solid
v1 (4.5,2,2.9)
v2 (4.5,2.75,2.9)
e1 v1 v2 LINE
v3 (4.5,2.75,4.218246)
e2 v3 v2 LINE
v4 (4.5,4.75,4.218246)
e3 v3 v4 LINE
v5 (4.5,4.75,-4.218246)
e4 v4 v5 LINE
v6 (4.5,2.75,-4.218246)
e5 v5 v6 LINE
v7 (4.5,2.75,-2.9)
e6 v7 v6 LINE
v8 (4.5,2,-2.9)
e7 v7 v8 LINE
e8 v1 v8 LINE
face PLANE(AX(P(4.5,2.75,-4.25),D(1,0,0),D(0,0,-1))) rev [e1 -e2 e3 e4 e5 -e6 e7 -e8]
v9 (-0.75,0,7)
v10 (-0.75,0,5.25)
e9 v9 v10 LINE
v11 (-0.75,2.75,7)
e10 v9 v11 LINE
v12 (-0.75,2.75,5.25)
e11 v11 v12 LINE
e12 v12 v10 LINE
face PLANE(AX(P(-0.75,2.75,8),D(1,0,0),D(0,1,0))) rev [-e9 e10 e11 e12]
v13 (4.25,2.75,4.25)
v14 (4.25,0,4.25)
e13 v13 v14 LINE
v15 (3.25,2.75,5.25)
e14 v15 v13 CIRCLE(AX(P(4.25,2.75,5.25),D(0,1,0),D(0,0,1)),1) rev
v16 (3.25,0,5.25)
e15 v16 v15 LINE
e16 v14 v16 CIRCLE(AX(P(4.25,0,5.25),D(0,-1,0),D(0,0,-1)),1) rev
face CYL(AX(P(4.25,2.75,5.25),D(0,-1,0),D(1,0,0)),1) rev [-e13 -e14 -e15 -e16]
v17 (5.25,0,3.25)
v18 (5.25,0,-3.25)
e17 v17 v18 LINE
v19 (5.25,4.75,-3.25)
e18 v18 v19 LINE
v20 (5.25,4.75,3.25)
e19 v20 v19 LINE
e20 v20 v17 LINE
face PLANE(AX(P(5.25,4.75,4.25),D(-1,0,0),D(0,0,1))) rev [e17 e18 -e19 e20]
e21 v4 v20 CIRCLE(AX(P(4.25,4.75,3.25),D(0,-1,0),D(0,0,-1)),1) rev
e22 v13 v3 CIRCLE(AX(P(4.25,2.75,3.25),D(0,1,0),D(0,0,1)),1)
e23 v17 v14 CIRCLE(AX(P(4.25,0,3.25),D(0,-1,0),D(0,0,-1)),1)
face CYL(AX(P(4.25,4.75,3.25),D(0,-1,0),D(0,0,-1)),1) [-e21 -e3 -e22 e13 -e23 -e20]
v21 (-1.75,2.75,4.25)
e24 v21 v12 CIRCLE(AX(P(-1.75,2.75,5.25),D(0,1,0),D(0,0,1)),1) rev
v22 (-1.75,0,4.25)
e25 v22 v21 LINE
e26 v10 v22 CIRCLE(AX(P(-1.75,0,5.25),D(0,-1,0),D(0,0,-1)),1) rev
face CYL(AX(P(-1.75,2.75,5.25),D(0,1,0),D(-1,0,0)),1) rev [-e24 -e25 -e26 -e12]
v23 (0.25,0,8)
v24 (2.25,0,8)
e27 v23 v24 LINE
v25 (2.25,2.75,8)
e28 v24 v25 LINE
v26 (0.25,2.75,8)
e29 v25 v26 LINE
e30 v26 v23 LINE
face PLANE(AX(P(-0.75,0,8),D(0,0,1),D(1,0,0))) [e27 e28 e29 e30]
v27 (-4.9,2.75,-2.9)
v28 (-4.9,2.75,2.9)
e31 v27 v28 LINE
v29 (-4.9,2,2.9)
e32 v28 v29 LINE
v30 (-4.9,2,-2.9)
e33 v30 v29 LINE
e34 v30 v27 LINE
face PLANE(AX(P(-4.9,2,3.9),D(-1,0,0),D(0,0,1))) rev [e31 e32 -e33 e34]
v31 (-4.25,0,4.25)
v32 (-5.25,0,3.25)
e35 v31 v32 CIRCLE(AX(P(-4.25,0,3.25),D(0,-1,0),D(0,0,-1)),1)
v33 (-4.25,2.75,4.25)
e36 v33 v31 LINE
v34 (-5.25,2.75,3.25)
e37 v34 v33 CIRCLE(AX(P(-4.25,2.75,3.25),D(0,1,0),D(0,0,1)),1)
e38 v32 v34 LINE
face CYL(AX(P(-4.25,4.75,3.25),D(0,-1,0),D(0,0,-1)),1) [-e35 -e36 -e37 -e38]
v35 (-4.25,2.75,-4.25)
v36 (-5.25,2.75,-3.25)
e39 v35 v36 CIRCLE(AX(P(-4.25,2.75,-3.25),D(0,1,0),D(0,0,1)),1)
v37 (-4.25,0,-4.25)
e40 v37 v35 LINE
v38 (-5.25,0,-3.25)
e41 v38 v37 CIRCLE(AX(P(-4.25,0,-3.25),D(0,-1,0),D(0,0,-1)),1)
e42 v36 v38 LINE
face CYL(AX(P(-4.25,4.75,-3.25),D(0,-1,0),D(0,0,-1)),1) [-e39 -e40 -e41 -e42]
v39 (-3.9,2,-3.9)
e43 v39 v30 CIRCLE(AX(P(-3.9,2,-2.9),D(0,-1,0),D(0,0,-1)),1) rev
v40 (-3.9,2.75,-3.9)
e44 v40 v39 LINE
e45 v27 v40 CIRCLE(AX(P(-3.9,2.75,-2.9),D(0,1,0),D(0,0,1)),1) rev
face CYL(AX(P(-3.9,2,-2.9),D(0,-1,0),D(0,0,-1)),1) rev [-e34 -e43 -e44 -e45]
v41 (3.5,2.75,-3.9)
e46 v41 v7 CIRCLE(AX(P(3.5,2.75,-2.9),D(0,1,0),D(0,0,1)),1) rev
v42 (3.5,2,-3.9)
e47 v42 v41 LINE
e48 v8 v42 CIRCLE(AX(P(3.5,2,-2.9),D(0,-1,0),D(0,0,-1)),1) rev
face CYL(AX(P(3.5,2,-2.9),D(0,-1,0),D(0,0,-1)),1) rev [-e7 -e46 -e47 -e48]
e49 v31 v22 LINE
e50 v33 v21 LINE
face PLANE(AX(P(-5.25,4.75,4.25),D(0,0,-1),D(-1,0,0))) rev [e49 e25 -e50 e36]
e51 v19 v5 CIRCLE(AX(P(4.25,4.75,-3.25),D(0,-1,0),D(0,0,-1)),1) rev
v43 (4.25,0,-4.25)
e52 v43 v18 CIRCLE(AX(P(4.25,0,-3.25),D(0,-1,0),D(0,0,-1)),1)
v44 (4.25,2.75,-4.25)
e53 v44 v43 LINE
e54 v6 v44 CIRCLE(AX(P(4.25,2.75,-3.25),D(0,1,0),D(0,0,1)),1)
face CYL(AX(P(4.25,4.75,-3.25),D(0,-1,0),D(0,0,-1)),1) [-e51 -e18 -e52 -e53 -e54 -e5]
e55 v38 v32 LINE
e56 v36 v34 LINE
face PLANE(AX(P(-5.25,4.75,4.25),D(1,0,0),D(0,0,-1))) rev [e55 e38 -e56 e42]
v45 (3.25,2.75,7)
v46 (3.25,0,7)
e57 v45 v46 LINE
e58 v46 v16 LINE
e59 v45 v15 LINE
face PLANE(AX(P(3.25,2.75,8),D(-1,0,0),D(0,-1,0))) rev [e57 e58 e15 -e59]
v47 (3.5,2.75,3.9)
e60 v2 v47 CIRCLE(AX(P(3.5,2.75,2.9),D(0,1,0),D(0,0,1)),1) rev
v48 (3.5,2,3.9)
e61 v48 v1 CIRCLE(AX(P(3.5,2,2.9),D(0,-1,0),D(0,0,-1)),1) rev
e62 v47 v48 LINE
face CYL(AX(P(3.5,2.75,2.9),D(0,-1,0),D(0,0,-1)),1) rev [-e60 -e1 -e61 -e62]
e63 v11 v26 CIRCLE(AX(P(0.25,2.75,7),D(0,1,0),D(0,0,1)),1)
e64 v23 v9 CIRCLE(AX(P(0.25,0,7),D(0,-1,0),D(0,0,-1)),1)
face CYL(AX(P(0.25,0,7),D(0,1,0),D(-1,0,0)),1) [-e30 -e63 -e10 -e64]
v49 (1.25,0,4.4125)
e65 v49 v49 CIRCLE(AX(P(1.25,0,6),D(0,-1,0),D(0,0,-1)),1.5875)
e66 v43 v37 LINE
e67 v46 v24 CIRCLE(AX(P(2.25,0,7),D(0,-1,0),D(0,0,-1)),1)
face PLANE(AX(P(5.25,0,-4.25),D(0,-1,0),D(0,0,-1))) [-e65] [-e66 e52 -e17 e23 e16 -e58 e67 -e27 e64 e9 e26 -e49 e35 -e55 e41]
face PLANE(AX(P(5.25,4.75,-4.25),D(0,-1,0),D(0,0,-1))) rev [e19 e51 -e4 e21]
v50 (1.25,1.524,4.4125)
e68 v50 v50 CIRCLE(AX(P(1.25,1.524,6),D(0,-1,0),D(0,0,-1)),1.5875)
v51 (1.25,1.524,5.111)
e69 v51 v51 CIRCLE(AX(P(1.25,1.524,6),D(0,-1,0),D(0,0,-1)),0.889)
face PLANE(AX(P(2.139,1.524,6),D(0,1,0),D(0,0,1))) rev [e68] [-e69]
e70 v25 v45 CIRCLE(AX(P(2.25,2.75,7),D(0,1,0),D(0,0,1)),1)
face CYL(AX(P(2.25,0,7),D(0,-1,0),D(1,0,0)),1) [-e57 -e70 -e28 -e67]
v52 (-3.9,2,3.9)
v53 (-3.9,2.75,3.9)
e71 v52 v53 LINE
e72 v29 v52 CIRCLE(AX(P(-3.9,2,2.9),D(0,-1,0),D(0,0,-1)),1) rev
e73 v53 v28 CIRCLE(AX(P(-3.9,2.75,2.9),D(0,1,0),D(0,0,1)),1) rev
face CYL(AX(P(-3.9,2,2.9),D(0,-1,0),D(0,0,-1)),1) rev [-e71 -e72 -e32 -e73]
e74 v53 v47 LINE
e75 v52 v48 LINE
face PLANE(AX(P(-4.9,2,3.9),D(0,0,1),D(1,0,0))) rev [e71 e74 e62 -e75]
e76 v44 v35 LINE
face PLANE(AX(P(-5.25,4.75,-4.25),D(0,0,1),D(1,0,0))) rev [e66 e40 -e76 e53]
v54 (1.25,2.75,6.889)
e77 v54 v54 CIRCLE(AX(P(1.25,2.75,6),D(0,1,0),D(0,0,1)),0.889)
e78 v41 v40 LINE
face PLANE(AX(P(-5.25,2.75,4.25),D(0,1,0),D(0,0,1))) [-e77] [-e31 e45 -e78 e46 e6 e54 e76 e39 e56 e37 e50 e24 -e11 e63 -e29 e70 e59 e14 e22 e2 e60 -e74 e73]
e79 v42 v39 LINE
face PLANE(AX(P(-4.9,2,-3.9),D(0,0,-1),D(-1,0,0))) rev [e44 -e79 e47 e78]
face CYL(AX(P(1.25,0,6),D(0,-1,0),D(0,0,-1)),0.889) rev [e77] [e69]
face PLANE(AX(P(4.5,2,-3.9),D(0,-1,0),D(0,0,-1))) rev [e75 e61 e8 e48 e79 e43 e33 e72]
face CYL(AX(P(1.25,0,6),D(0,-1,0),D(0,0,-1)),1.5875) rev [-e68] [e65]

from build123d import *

# Parameters (mm, degrees)
SKETCH1_W                                      = 10.5
SKETCH1_H                                      = 8.5
EXTRUDE1_DEPTH                                 = 4.75
SKETCH3_W                                      = 9.75
SKETCH3_H                                      = 8.5
EXTRUDE4_DEPTH                                 = 2
SKETCH4_W                                      = 9.4
SKETCH4_H                                      = 7.8
EXTRUDE5_DEPTH                                 = 0.75
SKETCH5_W                                      = 4
SKETCH5_H                                      = 2.75
EXTRUDE6_DEPTH                                 = 3.75
CBORE_FOR_0_SOCKET_HEAD_CAP_SCREW1_D           = 1.778
CBORE_FOR_0_SOCKET_HEAD_CAP_SCREW1_CBORE_D     = 3.175
CBORE_FOR_0_SOCKET_HEAD_CAP_SCREW1_CBORE_DEPTH = 1.524
FILLET1_R                                      = 1


with BuildPart() as part:
    # Sketch1 → Extrude1 (new body)
    with BuildSketch(Plane(origin=(0, 0, 0), x_dir=(1, 0, 0), z_dir=(0, 1, 0))):
        Rectangle(SKETCH1_W, SKETCH1_H)
    extrude(amount=EXTRUDE1_DEPTH)

    # Sketch3 → Extrude4 (cut)
    with BuildSketch(Plane(origin=(0, 4.75, 0), x_dir=(1, 0, 0), z_dir=(0, 1, 0))):
        with Locations((-0.375, 0)):
            Rectangle(SKETCH3_W, SKETCH3_H)
    extrude(amount=-EXTRUDE4_DEPTH, mode=Mode.SUBTRACT)

    # Sketch4 → Extrude5 (cut)
    with BuildSketch(Plane(origin=(0, 2.75, 0), x_dir=(1, 0, 0), z_dir=(0, 1, 0))):
        with Locations((-0.2, 0)):
            Rectangle(SKETCH4_W, SKETCH4_H)
    extrude(amount=-EXTRUDE5_DEPTH, mode=Mode.SUBTRACT)

    # Sketch5 → Extrude6 (add)
    with BuildSketch(Plane.XY.offset(4.25)):
        with Locations((1.25, 1.375)):
            Rectangle(SKETCH5_W, SKETCH5_H)
    extrude(amount=EXTRUDE6_DEPTH)

    # CBORE for #0 Socket Head Cap Screw1 (through all)
    with Locations(Plane(origin=(1.25, 0, 6), x_dir=(0, 0, -1), z_dir=(0, -1, 0))):
        with Locations((0, 0)):
            CounterBoreHole(CBORE_FOR_0_SOCKET_HEAD_CAP_SCREW1_D / 2, CBORE_FOR_0_SOCKET_HEAD_CAP_SCREW1_CBORE_D / 2, CBORE_FOR_0_SOCKET_HEAD_CAP_SCREW1_CBORE_DEPTH)

    # Fillet1
    # the kernel refuses this fillet: 1 mm, written as the material it adds along each edge
    with BuildSketch(Plane(origin=(3.25, 2.75, 4.25), x_dir=(0, 0, 1), z_dir=(0, -1, 0))) as fillet1_piece_1:
        with BuildLine():
            CenterArc((FILLET1_R, -FILLET1_R), FILLET1_R, 90, 90)
            Line((0, -FILLET1_R), (0, 0))
            Line((0, 0), (FILLET1_R, 0))
        make_face()
    extrude(amount=2.75)
    with BuildSketch(Plane(origin=(-0.75, 0, 4.25), x_dir=(-1, 0, 0), z_dir=(0, 1, 0))) as fillet1_piece_2:
        with BuildLine():
            CenterArc((FILLET1_R, FILLET1_R), FILLET1_R, 180, 90)
            Line((0, FILLET1_R), (0, 0))
            Line((0, 0), (FILLET1_R, 0))
        make_face()
    extrude(amount=2.75)
    with BuildSketch(Plane(origin=(4.5, 2.75, -3.9), x_dir=(0, 0, 1), z_dir=(0, -1, 0)), Plane(origin=(-4.9, 2.75, -3.9), x_dir=(1, 0, 0), z_dir=(0, -1, 0)), Plane(origin=(-4.9, 2.75, 3.9), x_dir=(0, 0, -1), z_dir=(0, -1, 0))) as fillet1_piece_3:
        with BuildLine():
            CenterArc((FILLET1_R, FILLET1_R), FILLET1_R, 180, 90)
            Line((0, FILLET1_R), (0, 0))
            Line((0, 0), (FILLET1_R, 0))
        make_face()
    extrude(amount=0.75)
    with BuildSketch(Plane(origin=(4.5, 2.75, 3.9), x_dir=(0, 0, -1), z_dir=(0, -1, 0))) as fillet1_piece_4:
        with BuildLine():
            CenterArc((FILLET1_R, -FILLET1_R), FILLET1_R, 90, 90)
            Line((0, -FILLET1_R), (0, 0))
            Line((0, 0), (FILLET1_R, 0))
        make_face()
    extrude(amount=0.75)
    # the kernel refuses this fillet: 1 mm, written as the material it takes off along each edge
    with BuildSketch(Plane(origin=(5.25, -2.5, -4.25), x_dir=(-1, 0, 0), z_dir=(0, 1, 0)), Plane(origin=(5.25, -2.5, 4.25), x_dir=(0, 0, -1), z_dir=(0, 1, 0))) as fillet1_2_piece_1:
        with BuildLine():
            CenterArc((FILLET1_R, FILLET1_R), FILLET1_R, 180, 90)
            Line((0, FILLET1_R), (0, 0))
            Line((0, 0), (FILLET1_R, 0))
        make_face()
    extrude(amount=9.75, mode=Mode.SUBTRACT)
    with BuildSketch(Plane(origin=(3.25, 5.25, 8), x_dir=(0, 0, -1), z_dir=(0, -1, 0))) as fillet1_2_piece_2:
        with BuildLine():
            CenterArc((FILLET1_R, -FILLET1_R), FILLET1_R, 90, 90)
            Line((0, -FILLET1_R), (0, 0))
            Line((0, 0), (FILLET1_R, 0))
        make_face()
    extrude(amount=7.75, mode=Mode.SUBTRACT)
    with BuildSketch(Plane(origin=(-0.75, -2.5, 8), x_dir=(1, 0, 0), z_dir=(0, 1, 0)), Plane(origin=(-5.25, -2.5, -4.25), x_dir=(0, 0, 1), z_dir=(0, 1, 0)), Plane(origin=(-5.25, -2.5, 4.25), x_dir=(1, 0, 0), z_dir=(0, 1, 0))) as fillet1_2_piece_3:
        with BuildLine():
            CenterArc((FILLET1_R, FILLET1_R), FILLET1_R, 180, 90)
            Line((0, FILLET1_R), (0, 0))
            Line((0, 0), (FILLET1_R, 0))
        make_face()
    extrude(amount=7.75, mode=Mode.SUBTRACT)


solid = part.part
